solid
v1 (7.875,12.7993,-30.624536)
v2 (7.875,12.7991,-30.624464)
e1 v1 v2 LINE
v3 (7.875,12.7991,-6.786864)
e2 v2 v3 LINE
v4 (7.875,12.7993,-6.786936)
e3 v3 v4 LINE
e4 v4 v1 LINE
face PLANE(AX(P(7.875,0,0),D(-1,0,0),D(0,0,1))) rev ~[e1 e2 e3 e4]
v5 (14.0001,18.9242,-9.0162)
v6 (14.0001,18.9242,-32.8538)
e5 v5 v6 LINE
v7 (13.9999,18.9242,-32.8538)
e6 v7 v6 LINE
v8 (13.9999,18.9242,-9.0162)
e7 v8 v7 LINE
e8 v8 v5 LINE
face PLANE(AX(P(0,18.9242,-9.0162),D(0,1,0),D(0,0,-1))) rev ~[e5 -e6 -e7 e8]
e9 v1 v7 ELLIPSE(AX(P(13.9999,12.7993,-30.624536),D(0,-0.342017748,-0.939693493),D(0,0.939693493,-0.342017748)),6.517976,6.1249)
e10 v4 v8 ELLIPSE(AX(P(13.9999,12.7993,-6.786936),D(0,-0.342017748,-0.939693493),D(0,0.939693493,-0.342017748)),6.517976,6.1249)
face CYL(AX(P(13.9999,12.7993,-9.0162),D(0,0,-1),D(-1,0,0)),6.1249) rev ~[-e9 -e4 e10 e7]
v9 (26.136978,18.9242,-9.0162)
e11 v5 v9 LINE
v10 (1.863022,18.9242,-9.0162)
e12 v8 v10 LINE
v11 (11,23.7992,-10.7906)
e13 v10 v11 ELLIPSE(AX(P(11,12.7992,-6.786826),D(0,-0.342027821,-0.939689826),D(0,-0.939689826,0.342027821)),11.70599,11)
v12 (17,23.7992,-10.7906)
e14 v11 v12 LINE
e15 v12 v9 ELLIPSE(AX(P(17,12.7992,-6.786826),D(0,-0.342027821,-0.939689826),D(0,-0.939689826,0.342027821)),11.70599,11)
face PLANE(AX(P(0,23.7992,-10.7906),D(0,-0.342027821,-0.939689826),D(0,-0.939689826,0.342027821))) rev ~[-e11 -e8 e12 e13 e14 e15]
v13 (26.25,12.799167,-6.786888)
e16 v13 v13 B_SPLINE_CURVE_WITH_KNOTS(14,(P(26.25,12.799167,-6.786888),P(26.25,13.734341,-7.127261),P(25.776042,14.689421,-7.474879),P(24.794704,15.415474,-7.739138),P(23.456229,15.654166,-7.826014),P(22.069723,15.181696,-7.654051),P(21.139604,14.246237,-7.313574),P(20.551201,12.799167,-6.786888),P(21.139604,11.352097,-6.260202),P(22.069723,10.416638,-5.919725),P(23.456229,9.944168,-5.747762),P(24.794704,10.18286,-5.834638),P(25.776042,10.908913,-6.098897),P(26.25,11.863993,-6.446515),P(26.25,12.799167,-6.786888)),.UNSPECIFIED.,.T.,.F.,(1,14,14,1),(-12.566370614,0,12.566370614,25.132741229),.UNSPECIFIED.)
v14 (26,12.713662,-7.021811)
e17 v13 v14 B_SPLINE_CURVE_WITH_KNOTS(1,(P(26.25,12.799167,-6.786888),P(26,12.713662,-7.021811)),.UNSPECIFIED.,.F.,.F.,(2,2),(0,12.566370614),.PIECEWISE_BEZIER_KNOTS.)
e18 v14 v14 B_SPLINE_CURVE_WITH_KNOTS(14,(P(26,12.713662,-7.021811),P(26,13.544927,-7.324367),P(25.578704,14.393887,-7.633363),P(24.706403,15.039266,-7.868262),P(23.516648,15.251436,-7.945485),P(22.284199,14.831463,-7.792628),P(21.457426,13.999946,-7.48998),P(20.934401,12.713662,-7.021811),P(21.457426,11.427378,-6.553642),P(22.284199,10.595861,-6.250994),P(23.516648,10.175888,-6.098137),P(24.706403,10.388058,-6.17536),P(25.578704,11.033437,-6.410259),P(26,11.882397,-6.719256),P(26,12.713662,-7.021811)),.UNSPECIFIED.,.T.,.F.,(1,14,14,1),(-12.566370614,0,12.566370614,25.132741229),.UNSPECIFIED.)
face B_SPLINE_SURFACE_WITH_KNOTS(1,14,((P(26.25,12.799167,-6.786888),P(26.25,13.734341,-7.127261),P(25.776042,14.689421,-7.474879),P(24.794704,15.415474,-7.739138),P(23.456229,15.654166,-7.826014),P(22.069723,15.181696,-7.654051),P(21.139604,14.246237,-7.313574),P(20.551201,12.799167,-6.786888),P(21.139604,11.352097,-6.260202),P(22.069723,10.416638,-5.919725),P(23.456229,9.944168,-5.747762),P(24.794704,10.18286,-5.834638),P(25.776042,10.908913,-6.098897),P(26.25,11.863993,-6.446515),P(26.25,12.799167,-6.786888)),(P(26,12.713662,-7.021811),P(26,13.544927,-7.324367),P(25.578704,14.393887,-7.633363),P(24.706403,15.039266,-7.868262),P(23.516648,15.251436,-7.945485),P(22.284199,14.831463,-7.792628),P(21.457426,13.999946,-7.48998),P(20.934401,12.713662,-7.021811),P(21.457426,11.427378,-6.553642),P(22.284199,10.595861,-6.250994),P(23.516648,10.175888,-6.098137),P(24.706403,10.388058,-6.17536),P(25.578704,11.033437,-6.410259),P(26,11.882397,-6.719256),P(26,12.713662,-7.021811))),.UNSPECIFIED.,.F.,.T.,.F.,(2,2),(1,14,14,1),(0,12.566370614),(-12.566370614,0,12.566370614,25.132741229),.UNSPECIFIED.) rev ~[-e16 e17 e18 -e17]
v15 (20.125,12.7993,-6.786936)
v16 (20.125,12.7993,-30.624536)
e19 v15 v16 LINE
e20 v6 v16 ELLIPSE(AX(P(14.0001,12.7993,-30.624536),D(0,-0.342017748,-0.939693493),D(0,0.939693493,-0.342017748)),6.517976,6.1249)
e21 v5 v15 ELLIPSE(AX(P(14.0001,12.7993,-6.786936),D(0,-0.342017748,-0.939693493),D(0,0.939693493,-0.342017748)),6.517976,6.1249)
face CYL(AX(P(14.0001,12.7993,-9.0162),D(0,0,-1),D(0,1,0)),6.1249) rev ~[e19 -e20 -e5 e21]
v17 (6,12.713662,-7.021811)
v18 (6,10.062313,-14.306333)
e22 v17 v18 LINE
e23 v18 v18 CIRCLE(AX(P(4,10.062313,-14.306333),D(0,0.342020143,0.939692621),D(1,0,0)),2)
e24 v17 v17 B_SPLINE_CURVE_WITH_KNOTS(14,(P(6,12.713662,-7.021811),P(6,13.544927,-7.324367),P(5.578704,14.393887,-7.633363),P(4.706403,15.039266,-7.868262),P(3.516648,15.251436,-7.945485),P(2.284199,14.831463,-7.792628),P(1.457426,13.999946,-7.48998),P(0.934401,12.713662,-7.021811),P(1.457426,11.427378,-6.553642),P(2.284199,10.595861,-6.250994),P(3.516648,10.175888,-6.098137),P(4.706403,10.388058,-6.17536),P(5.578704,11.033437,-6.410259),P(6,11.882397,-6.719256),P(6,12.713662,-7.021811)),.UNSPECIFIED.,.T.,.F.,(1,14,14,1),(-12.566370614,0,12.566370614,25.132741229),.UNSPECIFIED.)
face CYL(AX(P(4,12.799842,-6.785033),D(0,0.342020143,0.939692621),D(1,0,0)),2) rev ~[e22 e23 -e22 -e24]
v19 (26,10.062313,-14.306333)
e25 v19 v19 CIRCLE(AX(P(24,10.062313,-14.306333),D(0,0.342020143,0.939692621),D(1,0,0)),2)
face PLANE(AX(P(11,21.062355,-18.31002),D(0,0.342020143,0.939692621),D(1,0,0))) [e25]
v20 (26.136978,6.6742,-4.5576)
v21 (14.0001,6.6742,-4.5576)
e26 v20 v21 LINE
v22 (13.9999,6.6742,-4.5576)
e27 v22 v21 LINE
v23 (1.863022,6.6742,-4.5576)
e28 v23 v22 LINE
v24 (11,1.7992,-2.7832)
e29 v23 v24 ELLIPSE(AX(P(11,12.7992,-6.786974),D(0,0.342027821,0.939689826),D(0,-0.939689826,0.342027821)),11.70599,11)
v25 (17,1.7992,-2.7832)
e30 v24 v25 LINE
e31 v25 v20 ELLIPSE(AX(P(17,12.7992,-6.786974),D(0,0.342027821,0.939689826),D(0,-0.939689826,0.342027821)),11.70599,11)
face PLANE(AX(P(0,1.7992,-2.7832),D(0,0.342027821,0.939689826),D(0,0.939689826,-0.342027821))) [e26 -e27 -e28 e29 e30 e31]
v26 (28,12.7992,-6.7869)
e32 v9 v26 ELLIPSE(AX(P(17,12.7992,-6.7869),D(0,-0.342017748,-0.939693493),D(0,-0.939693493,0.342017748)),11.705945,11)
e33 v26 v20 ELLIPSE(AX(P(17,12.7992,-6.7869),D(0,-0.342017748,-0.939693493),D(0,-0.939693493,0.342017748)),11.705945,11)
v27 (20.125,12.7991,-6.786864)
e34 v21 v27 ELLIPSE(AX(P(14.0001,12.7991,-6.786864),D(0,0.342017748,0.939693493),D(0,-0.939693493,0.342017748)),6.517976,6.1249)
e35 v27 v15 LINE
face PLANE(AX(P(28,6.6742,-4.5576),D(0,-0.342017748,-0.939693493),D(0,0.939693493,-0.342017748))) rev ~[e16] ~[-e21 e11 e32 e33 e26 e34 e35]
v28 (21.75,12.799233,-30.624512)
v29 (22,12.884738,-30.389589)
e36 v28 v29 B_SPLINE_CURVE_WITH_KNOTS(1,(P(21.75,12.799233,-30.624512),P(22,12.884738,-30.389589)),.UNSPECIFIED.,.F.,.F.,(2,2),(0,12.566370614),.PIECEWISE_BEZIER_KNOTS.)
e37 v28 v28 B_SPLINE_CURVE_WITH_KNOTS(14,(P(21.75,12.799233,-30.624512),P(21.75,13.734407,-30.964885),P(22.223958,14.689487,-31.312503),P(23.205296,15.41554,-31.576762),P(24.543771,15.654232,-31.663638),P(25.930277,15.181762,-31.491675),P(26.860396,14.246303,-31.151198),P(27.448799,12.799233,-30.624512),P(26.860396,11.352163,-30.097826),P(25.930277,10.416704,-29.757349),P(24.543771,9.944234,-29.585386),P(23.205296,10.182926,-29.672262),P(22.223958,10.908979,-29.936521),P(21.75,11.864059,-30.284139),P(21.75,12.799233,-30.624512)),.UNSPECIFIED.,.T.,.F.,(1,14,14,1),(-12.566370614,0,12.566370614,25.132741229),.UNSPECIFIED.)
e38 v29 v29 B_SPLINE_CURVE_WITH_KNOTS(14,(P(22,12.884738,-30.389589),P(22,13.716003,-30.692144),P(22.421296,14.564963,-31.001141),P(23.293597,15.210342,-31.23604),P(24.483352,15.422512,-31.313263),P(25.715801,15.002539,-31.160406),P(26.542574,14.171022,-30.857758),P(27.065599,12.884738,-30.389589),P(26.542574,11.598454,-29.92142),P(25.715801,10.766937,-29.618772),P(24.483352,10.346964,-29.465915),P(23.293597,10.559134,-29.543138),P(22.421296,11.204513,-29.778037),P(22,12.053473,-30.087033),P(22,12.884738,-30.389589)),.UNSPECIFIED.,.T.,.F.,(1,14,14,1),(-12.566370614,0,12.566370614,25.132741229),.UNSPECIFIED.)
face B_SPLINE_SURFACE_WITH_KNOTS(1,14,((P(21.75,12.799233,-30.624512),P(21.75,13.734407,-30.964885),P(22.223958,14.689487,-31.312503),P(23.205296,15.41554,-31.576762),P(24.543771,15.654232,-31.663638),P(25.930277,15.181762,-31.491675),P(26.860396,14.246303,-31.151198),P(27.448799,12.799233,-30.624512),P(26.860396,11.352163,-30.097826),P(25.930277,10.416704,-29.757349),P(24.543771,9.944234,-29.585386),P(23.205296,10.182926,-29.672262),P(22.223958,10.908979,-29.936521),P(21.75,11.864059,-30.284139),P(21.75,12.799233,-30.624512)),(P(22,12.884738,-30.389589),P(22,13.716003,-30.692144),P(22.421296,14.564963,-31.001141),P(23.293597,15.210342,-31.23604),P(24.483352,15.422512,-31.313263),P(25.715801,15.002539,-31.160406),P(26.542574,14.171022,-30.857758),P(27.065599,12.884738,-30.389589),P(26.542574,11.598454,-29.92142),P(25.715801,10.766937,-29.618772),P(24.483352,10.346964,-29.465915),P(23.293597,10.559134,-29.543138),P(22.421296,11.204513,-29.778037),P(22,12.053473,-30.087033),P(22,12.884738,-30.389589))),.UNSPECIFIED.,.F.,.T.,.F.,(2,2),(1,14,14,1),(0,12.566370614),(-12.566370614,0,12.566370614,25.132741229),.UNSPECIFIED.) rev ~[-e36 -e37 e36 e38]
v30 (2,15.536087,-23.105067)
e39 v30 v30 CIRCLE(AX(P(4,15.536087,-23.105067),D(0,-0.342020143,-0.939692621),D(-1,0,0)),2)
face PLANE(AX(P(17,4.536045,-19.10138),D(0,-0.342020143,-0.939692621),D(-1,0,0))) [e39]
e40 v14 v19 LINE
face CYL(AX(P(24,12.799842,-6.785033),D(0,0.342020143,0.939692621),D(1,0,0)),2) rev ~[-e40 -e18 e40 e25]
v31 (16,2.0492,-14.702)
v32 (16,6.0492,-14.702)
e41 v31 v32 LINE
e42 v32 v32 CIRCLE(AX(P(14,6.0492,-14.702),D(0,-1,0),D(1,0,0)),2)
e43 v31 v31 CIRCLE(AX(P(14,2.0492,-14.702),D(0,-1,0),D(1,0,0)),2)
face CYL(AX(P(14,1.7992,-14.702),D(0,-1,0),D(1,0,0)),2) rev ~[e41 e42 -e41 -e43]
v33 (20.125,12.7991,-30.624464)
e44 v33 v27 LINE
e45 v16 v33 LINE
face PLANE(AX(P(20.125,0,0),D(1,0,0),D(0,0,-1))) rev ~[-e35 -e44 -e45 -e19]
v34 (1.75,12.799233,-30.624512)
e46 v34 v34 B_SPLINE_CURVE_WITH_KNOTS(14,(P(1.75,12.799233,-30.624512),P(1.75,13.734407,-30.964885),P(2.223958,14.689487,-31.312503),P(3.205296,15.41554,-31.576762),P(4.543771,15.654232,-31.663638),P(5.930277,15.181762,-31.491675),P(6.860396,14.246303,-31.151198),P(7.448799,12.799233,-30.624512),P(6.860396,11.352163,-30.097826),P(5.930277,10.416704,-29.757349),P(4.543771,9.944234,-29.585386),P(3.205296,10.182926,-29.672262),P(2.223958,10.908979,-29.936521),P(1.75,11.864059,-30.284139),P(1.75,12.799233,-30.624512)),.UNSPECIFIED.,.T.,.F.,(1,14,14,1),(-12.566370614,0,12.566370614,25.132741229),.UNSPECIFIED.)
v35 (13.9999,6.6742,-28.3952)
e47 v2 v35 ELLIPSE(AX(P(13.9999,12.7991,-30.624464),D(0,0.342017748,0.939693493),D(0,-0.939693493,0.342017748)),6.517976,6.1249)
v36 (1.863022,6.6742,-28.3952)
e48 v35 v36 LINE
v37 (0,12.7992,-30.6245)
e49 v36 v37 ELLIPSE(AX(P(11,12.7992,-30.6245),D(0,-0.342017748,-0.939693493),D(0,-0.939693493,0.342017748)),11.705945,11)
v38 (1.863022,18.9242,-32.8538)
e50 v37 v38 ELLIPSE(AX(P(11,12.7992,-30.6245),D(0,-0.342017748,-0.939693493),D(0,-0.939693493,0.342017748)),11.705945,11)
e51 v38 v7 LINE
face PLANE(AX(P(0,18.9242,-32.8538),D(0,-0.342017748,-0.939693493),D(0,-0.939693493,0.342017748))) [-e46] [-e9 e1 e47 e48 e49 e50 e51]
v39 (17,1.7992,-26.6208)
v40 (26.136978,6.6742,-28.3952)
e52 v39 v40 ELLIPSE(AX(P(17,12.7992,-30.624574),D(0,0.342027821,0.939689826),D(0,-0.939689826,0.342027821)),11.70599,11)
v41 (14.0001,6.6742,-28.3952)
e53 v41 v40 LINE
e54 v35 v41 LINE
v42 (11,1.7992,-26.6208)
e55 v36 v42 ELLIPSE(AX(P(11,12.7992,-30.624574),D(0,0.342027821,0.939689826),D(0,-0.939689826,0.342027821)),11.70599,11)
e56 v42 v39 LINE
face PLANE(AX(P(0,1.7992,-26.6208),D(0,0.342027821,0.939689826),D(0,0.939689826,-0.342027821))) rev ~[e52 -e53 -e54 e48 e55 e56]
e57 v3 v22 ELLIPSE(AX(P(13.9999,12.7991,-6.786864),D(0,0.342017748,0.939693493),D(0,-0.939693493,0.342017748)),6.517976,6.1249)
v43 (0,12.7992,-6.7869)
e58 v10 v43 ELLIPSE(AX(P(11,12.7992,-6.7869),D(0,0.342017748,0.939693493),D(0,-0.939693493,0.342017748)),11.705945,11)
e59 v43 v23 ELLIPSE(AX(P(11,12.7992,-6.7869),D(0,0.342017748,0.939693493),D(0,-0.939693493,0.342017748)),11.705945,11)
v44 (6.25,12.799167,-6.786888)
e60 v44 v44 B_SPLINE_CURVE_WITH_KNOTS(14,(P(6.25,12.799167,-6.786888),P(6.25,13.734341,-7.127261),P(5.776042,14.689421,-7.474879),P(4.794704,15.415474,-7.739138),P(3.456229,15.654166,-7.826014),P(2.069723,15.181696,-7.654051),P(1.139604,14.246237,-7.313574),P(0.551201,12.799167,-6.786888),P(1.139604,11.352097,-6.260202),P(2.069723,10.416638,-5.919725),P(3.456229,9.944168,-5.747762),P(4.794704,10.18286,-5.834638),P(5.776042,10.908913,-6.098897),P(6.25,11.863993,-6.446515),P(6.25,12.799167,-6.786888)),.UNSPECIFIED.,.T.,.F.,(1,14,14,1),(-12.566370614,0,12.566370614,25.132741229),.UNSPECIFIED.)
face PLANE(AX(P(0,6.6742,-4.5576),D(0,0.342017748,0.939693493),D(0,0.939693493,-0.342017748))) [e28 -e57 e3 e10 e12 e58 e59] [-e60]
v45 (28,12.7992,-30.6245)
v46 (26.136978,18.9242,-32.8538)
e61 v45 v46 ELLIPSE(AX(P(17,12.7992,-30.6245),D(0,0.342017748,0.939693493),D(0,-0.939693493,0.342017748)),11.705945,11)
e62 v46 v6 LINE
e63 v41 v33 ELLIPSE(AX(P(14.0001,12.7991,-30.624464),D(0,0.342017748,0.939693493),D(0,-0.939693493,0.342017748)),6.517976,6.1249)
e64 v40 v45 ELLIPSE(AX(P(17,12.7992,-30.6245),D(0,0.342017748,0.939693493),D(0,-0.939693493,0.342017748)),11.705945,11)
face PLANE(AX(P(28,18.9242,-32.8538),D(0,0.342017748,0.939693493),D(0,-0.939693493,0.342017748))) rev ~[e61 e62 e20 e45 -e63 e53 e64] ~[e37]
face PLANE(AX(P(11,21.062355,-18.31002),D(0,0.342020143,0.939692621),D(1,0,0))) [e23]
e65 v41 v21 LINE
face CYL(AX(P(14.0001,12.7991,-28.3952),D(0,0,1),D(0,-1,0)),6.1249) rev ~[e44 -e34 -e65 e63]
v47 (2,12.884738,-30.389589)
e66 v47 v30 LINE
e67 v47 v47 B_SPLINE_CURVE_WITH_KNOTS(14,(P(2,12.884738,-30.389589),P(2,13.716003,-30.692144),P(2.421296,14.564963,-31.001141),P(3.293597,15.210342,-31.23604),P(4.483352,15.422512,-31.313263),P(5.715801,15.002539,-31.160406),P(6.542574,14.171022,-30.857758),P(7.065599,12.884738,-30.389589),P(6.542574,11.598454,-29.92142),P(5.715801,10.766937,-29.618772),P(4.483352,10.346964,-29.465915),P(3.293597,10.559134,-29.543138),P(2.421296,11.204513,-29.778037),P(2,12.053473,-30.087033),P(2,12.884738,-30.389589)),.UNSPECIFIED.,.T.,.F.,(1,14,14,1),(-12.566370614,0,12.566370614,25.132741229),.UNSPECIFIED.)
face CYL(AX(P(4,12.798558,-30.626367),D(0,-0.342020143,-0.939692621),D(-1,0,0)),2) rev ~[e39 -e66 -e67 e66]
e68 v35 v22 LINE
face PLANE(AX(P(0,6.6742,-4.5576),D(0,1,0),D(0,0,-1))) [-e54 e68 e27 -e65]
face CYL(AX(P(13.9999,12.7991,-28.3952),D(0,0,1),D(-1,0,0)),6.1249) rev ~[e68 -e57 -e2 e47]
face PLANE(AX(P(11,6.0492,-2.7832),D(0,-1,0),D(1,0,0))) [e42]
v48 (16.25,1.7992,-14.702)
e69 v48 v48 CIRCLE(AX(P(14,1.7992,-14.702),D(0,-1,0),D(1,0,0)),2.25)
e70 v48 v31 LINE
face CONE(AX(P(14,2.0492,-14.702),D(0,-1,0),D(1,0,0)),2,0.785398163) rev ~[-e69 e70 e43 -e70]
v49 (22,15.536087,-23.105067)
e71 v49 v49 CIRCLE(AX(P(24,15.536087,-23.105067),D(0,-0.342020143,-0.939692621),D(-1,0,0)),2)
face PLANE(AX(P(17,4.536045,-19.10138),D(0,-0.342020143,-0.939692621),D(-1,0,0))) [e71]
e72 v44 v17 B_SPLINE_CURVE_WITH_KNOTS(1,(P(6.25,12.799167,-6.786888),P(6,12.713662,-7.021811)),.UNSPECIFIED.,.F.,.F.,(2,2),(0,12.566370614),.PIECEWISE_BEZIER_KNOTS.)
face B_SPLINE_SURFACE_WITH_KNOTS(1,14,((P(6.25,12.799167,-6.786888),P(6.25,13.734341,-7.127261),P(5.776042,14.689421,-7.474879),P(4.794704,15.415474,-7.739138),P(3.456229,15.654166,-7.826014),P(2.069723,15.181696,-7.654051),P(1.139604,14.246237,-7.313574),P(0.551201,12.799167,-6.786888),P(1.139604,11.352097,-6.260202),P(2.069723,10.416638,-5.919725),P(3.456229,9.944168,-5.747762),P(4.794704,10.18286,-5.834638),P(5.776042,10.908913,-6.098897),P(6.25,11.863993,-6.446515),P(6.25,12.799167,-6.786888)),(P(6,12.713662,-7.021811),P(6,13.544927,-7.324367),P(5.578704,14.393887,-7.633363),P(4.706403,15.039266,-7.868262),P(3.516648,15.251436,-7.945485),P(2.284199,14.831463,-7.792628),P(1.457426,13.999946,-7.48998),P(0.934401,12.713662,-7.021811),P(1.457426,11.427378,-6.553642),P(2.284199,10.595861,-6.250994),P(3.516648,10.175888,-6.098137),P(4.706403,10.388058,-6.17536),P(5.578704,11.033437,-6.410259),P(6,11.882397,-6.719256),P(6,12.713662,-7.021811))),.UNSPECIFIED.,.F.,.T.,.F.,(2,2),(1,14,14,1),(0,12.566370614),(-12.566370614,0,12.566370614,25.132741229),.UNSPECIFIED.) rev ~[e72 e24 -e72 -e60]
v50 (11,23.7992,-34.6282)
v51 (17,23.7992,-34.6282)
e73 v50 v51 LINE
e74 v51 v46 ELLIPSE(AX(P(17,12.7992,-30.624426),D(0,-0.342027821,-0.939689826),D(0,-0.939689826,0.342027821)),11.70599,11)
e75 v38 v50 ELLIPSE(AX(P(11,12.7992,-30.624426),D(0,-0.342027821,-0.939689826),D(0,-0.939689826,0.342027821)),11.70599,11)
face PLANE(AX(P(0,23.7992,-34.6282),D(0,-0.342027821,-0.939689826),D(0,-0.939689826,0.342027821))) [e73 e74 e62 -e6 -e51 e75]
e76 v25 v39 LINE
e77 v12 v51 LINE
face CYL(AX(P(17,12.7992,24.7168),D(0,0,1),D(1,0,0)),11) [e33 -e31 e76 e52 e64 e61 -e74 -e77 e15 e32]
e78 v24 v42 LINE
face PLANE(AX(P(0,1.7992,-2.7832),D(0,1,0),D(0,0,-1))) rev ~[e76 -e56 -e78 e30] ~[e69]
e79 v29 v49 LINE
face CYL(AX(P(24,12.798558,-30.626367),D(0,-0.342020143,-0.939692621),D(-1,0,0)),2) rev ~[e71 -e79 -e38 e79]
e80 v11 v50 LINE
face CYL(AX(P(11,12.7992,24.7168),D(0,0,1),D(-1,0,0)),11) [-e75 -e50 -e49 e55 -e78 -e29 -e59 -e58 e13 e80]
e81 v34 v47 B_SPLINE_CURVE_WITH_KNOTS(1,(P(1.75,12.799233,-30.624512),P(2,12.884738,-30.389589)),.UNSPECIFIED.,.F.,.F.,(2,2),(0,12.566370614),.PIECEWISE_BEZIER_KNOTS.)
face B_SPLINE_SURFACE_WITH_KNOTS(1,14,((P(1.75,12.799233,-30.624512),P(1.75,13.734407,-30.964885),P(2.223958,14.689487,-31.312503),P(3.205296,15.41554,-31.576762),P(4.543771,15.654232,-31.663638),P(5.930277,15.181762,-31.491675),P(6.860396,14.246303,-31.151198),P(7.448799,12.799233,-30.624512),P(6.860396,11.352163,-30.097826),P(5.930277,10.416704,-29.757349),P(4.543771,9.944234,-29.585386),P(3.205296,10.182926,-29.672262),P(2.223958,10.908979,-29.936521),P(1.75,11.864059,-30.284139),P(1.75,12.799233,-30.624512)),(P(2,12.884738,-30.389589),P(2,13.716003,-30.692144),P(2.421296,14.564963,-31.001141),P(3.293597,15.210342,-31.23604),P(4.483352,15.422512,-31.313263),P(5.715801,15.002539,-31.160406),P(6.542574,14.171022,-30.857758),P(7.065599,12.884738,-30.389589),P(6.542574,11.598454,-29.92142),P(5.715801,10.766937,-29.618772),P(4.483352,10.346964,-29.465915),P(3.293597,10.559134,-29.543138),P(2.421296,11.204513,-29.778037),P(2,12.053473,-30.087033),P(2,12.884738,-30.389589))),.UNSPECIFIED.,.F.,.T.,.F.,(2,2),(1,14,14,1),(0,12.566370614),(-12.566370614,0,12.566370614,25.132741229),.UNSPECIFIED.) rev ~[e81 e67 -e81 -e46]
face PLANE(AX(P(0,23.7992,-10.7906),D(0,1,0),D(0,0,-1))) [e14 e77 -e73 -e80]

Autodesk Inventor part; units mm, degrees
ref_plane "YZ Plane" through (0, 0, 0) normal (1, 0, 0) x (0, 1, 0)
ref_plane "XZ Plane" through (0, 0, 0) normal (0, 1, 0) x (-1, 0, 0)
ref_plane "XY Plane" through (0, 0, 0) normal (0, 0, 1) x (1, 0, 0)
sketch "Sketch1" plane through (0, 0, 0) normal (1, 0, 0) x (0, 1, 0)
  line L0 (0, 0) -> (35.2385, -12.8258) construction
  line L1 (0, 0) -> (37.5, 0) construction
  line L2 (35.2385, -12.8258) -> (34.5544, -14.7051) construction
  line L3 (34.5544, -14.7051) -> (-0.684, -1.8794) construction
  line L4 (-0.684, -1.8794) -> (0, 0) construction
  line L5 (34.5544, -14.7051) -> (26.8932, -35.7543) construction
  line L6 (26.8932, -35.7543) -> (-8.3453, -22.9285) construction
  line L7 (-8.3453, -22.9285) -> (-9.0293, -24.8079) construction
  line L8 (-9.0293, -24.8079) -> (26.2091, -37.6336) construction
  line L9 (26.2091, -37.6336) -> (26.8932, -35.7543) construction
  line L10 (16.9352, -8.2923) -> (8.6633, -29.1191) construction
  line L11 (12.7992, 23.1416) -> (12.7992, -60.5529) construction
  line L12 (6.7992, 23.1416) -> (6.7992, -60.5529) construction
  line L13 (18.7992, 23.1416) -> (18.7992, -60.5529) construction
  line L14 (12.7992, -4.6585) -> (23.6057, -8.5918) construction
  line L15 (23.6057, -8.5918) -> (14.5764, -33.3997) construction
  line L16 (12.7992, -4.6585) -> (1.9928, -0.7253) construction
  line L17 (1.9928, -0.7253) -> (-7.0366, -25.5332) construction
  line L18 (1.7992, 23.1416) -> (1.7992, -60.5529)
  line L19 (23.7992, 23.1416) -> (23.7992, -60.5529)
  line L20 (18.9242, 23.1416) -> (18.9242, -60.5529)
  line L21 (6.6742, 23.1416) -> (6.6742, -60.5529)
  line L22 (1.7992, -2.7832) -> (6.6742, -4.5576)
  line L23 (1.7992, -26.6208) -> (6.6742, -28.3952)
  line L24 (23.7992, -34.6282) -> (18.9242, -32.8538)
  line L25 (23.7992, -10.7906) -> (18.9242, -9.0162)
  point P0 (12.7992, -18.7057)
  dimension "d1" = 37.5
  dimension "d2" = 20
  dimension "d3" = 2
  dimension "d4" = 22.4
  dimension "d5" = 37.5
  dimension "d6" = 2
  dimension "d7" = 6
  dimension "d8" = 6
  dimension "d9" = 11.5
  dimension "d10" = 11.5
  dimension "d13" = 11
  dimension "d14" = 11
  dimension "d15" = 4.875
  dimension "d16" = 4.875
extrude "Extrusion1" add sketch "Sketch1" along normal blind 28
sketch "Sketch2" plane through (28, 0, 0) normal (1, 0, 0) x (0, 0, -1)
  line L0 (28.3952, 6.6742) -> (4.5576, 6.6742) projected
  line L1 (9.0162, 18.9242) -> (32.8538, 18.9242) projected
  line L2 (4.5576, 6.6742) -> (9.0162, 18.9242)
  line L3 (9.0162, 18.9242) -> (32.8538, 18.9242)
  line L4 (32.8538, 18.9242) -> (28.3952, 6.6742)
  line L5 (28.3952, 6.6742) -> (4.5576, 6.6742)
  point P0 (0, 0)
  point P1 (28.3952, 6.6742)
extrude "Extrusion2" add sketch "Sketch2" against normal blind 7.875
sketch "Sketch3" plane through (0, 0, 0) normal (-1, 0, 0) x (0, 0, 1)
  line L0 (-9.0162, 18.9242) -> (-32.8538, 18.9242) projected
  line L1 (-26.6208, 1.7992) -> (-28.3952, 6.6742) projected
  line L2 (-32.8538, 18.9242) -> (-28.3952, 6.6742)
  line L3 (-28.3952, 6.6742) -> (-4.5576, 6.6742)
  line L4 (-4.5576, 6.6742) -> (-9.0162, 18.9242)
  line L5 (-9.0162, 18.9242) -> (-32.8538, 18.9242)
  point P0 (0, 0)
  point P1 (-9.0162, 18.9242)
extrude "Extrusion3" add sketch "Sketch3" against normal blind 7.875
fillet "Fillet1" radius 6.125 4 edges at (7.875, 6.6742, -16.4764) (20.125, 6.6742, -16.4764) (20.125, 18.9242, -20.935) (7.875, 18.9242, -20.935)
fillet "Fillet2" radius 11 4 edges at (0, 23.7992, -22.7094) (0, 1.7992, -14.702) (28, 1.7992, -14.702) (28, 23.7992, -22.7094)
sketch "Sketch4" plane through (11, 23.7992, -10.7906) normal (0, 0.3420201, 0.9396926) x (1, 0, 0)
  ellipse E0 centre (3, -11.706) end of major axis (3, -18.224) minor radius 6.125 construction
  circle A0 centre (3, -11.706) radius 10 construction
  circle A1 centre (-7, -11.706) radius 2
  circle A2 centre (13, -11.706) radius 2
  point P0 (-11, -26.0546)
  dimension "d25" = 20
  dimension "d26" = 4
  dimension "d27" = 4
extrude "Extrusion4" cut sketch "Sketch4" against normal blind 8
sketch "Sketch5" plane through (17, 1.7992, -26.6208) normal (0, -0.3420201, -0.9396926) x (-1, 0, 0)
  ellipse E0 centre (3, 11.706) end of major axis (3, 18.224) minor radius 6.125 projected
  circle A0 centre (3, 11.706) radius 10 construction
  circle A1 centre (-7, 11.706) radius 2
  circle A2 centre (13, 11.706) radius 2
  point P0 (17, -10.7956)
  dimension "d30" = 20
  dimension "d31" = 4
  dimension "d32" = 4
extrude "Extrusion5" cut sketch "Sketch5" against normal blind 8 contours A1 | A2
sketch "Sketch6" plane through (11, 1.7992, -2.7832) normal (0, -1, 0) x (1, 0, 0)
  line L0 (0, -23.8376) -> (0, 0) projected
  line L1 (0, -11.9188) -> (6, -11.9188) construction
  line L2 (6, 0) -> (6, -23.8376) projected
  circle A0 centre (3, -11.9188) radius 2
  point P0 (-11, 2.7832)
  dimension "d35" = 4
extrude "Extrusion6" cut sketch "Sketch6" against normal blind 4.25
chamfer "Chamfer1" distance 0.25 angle 45 5 edges at (12, 1.7992, -14.702) (6, 12.7992, -30.6245) (26, 12.7992, -30.6245) (22, 12.7992, -6.7869) (2, 12.7992, -6.7869)
properties part number "Leg_Loadpipe_Mount" material "Nylon 6/6"
